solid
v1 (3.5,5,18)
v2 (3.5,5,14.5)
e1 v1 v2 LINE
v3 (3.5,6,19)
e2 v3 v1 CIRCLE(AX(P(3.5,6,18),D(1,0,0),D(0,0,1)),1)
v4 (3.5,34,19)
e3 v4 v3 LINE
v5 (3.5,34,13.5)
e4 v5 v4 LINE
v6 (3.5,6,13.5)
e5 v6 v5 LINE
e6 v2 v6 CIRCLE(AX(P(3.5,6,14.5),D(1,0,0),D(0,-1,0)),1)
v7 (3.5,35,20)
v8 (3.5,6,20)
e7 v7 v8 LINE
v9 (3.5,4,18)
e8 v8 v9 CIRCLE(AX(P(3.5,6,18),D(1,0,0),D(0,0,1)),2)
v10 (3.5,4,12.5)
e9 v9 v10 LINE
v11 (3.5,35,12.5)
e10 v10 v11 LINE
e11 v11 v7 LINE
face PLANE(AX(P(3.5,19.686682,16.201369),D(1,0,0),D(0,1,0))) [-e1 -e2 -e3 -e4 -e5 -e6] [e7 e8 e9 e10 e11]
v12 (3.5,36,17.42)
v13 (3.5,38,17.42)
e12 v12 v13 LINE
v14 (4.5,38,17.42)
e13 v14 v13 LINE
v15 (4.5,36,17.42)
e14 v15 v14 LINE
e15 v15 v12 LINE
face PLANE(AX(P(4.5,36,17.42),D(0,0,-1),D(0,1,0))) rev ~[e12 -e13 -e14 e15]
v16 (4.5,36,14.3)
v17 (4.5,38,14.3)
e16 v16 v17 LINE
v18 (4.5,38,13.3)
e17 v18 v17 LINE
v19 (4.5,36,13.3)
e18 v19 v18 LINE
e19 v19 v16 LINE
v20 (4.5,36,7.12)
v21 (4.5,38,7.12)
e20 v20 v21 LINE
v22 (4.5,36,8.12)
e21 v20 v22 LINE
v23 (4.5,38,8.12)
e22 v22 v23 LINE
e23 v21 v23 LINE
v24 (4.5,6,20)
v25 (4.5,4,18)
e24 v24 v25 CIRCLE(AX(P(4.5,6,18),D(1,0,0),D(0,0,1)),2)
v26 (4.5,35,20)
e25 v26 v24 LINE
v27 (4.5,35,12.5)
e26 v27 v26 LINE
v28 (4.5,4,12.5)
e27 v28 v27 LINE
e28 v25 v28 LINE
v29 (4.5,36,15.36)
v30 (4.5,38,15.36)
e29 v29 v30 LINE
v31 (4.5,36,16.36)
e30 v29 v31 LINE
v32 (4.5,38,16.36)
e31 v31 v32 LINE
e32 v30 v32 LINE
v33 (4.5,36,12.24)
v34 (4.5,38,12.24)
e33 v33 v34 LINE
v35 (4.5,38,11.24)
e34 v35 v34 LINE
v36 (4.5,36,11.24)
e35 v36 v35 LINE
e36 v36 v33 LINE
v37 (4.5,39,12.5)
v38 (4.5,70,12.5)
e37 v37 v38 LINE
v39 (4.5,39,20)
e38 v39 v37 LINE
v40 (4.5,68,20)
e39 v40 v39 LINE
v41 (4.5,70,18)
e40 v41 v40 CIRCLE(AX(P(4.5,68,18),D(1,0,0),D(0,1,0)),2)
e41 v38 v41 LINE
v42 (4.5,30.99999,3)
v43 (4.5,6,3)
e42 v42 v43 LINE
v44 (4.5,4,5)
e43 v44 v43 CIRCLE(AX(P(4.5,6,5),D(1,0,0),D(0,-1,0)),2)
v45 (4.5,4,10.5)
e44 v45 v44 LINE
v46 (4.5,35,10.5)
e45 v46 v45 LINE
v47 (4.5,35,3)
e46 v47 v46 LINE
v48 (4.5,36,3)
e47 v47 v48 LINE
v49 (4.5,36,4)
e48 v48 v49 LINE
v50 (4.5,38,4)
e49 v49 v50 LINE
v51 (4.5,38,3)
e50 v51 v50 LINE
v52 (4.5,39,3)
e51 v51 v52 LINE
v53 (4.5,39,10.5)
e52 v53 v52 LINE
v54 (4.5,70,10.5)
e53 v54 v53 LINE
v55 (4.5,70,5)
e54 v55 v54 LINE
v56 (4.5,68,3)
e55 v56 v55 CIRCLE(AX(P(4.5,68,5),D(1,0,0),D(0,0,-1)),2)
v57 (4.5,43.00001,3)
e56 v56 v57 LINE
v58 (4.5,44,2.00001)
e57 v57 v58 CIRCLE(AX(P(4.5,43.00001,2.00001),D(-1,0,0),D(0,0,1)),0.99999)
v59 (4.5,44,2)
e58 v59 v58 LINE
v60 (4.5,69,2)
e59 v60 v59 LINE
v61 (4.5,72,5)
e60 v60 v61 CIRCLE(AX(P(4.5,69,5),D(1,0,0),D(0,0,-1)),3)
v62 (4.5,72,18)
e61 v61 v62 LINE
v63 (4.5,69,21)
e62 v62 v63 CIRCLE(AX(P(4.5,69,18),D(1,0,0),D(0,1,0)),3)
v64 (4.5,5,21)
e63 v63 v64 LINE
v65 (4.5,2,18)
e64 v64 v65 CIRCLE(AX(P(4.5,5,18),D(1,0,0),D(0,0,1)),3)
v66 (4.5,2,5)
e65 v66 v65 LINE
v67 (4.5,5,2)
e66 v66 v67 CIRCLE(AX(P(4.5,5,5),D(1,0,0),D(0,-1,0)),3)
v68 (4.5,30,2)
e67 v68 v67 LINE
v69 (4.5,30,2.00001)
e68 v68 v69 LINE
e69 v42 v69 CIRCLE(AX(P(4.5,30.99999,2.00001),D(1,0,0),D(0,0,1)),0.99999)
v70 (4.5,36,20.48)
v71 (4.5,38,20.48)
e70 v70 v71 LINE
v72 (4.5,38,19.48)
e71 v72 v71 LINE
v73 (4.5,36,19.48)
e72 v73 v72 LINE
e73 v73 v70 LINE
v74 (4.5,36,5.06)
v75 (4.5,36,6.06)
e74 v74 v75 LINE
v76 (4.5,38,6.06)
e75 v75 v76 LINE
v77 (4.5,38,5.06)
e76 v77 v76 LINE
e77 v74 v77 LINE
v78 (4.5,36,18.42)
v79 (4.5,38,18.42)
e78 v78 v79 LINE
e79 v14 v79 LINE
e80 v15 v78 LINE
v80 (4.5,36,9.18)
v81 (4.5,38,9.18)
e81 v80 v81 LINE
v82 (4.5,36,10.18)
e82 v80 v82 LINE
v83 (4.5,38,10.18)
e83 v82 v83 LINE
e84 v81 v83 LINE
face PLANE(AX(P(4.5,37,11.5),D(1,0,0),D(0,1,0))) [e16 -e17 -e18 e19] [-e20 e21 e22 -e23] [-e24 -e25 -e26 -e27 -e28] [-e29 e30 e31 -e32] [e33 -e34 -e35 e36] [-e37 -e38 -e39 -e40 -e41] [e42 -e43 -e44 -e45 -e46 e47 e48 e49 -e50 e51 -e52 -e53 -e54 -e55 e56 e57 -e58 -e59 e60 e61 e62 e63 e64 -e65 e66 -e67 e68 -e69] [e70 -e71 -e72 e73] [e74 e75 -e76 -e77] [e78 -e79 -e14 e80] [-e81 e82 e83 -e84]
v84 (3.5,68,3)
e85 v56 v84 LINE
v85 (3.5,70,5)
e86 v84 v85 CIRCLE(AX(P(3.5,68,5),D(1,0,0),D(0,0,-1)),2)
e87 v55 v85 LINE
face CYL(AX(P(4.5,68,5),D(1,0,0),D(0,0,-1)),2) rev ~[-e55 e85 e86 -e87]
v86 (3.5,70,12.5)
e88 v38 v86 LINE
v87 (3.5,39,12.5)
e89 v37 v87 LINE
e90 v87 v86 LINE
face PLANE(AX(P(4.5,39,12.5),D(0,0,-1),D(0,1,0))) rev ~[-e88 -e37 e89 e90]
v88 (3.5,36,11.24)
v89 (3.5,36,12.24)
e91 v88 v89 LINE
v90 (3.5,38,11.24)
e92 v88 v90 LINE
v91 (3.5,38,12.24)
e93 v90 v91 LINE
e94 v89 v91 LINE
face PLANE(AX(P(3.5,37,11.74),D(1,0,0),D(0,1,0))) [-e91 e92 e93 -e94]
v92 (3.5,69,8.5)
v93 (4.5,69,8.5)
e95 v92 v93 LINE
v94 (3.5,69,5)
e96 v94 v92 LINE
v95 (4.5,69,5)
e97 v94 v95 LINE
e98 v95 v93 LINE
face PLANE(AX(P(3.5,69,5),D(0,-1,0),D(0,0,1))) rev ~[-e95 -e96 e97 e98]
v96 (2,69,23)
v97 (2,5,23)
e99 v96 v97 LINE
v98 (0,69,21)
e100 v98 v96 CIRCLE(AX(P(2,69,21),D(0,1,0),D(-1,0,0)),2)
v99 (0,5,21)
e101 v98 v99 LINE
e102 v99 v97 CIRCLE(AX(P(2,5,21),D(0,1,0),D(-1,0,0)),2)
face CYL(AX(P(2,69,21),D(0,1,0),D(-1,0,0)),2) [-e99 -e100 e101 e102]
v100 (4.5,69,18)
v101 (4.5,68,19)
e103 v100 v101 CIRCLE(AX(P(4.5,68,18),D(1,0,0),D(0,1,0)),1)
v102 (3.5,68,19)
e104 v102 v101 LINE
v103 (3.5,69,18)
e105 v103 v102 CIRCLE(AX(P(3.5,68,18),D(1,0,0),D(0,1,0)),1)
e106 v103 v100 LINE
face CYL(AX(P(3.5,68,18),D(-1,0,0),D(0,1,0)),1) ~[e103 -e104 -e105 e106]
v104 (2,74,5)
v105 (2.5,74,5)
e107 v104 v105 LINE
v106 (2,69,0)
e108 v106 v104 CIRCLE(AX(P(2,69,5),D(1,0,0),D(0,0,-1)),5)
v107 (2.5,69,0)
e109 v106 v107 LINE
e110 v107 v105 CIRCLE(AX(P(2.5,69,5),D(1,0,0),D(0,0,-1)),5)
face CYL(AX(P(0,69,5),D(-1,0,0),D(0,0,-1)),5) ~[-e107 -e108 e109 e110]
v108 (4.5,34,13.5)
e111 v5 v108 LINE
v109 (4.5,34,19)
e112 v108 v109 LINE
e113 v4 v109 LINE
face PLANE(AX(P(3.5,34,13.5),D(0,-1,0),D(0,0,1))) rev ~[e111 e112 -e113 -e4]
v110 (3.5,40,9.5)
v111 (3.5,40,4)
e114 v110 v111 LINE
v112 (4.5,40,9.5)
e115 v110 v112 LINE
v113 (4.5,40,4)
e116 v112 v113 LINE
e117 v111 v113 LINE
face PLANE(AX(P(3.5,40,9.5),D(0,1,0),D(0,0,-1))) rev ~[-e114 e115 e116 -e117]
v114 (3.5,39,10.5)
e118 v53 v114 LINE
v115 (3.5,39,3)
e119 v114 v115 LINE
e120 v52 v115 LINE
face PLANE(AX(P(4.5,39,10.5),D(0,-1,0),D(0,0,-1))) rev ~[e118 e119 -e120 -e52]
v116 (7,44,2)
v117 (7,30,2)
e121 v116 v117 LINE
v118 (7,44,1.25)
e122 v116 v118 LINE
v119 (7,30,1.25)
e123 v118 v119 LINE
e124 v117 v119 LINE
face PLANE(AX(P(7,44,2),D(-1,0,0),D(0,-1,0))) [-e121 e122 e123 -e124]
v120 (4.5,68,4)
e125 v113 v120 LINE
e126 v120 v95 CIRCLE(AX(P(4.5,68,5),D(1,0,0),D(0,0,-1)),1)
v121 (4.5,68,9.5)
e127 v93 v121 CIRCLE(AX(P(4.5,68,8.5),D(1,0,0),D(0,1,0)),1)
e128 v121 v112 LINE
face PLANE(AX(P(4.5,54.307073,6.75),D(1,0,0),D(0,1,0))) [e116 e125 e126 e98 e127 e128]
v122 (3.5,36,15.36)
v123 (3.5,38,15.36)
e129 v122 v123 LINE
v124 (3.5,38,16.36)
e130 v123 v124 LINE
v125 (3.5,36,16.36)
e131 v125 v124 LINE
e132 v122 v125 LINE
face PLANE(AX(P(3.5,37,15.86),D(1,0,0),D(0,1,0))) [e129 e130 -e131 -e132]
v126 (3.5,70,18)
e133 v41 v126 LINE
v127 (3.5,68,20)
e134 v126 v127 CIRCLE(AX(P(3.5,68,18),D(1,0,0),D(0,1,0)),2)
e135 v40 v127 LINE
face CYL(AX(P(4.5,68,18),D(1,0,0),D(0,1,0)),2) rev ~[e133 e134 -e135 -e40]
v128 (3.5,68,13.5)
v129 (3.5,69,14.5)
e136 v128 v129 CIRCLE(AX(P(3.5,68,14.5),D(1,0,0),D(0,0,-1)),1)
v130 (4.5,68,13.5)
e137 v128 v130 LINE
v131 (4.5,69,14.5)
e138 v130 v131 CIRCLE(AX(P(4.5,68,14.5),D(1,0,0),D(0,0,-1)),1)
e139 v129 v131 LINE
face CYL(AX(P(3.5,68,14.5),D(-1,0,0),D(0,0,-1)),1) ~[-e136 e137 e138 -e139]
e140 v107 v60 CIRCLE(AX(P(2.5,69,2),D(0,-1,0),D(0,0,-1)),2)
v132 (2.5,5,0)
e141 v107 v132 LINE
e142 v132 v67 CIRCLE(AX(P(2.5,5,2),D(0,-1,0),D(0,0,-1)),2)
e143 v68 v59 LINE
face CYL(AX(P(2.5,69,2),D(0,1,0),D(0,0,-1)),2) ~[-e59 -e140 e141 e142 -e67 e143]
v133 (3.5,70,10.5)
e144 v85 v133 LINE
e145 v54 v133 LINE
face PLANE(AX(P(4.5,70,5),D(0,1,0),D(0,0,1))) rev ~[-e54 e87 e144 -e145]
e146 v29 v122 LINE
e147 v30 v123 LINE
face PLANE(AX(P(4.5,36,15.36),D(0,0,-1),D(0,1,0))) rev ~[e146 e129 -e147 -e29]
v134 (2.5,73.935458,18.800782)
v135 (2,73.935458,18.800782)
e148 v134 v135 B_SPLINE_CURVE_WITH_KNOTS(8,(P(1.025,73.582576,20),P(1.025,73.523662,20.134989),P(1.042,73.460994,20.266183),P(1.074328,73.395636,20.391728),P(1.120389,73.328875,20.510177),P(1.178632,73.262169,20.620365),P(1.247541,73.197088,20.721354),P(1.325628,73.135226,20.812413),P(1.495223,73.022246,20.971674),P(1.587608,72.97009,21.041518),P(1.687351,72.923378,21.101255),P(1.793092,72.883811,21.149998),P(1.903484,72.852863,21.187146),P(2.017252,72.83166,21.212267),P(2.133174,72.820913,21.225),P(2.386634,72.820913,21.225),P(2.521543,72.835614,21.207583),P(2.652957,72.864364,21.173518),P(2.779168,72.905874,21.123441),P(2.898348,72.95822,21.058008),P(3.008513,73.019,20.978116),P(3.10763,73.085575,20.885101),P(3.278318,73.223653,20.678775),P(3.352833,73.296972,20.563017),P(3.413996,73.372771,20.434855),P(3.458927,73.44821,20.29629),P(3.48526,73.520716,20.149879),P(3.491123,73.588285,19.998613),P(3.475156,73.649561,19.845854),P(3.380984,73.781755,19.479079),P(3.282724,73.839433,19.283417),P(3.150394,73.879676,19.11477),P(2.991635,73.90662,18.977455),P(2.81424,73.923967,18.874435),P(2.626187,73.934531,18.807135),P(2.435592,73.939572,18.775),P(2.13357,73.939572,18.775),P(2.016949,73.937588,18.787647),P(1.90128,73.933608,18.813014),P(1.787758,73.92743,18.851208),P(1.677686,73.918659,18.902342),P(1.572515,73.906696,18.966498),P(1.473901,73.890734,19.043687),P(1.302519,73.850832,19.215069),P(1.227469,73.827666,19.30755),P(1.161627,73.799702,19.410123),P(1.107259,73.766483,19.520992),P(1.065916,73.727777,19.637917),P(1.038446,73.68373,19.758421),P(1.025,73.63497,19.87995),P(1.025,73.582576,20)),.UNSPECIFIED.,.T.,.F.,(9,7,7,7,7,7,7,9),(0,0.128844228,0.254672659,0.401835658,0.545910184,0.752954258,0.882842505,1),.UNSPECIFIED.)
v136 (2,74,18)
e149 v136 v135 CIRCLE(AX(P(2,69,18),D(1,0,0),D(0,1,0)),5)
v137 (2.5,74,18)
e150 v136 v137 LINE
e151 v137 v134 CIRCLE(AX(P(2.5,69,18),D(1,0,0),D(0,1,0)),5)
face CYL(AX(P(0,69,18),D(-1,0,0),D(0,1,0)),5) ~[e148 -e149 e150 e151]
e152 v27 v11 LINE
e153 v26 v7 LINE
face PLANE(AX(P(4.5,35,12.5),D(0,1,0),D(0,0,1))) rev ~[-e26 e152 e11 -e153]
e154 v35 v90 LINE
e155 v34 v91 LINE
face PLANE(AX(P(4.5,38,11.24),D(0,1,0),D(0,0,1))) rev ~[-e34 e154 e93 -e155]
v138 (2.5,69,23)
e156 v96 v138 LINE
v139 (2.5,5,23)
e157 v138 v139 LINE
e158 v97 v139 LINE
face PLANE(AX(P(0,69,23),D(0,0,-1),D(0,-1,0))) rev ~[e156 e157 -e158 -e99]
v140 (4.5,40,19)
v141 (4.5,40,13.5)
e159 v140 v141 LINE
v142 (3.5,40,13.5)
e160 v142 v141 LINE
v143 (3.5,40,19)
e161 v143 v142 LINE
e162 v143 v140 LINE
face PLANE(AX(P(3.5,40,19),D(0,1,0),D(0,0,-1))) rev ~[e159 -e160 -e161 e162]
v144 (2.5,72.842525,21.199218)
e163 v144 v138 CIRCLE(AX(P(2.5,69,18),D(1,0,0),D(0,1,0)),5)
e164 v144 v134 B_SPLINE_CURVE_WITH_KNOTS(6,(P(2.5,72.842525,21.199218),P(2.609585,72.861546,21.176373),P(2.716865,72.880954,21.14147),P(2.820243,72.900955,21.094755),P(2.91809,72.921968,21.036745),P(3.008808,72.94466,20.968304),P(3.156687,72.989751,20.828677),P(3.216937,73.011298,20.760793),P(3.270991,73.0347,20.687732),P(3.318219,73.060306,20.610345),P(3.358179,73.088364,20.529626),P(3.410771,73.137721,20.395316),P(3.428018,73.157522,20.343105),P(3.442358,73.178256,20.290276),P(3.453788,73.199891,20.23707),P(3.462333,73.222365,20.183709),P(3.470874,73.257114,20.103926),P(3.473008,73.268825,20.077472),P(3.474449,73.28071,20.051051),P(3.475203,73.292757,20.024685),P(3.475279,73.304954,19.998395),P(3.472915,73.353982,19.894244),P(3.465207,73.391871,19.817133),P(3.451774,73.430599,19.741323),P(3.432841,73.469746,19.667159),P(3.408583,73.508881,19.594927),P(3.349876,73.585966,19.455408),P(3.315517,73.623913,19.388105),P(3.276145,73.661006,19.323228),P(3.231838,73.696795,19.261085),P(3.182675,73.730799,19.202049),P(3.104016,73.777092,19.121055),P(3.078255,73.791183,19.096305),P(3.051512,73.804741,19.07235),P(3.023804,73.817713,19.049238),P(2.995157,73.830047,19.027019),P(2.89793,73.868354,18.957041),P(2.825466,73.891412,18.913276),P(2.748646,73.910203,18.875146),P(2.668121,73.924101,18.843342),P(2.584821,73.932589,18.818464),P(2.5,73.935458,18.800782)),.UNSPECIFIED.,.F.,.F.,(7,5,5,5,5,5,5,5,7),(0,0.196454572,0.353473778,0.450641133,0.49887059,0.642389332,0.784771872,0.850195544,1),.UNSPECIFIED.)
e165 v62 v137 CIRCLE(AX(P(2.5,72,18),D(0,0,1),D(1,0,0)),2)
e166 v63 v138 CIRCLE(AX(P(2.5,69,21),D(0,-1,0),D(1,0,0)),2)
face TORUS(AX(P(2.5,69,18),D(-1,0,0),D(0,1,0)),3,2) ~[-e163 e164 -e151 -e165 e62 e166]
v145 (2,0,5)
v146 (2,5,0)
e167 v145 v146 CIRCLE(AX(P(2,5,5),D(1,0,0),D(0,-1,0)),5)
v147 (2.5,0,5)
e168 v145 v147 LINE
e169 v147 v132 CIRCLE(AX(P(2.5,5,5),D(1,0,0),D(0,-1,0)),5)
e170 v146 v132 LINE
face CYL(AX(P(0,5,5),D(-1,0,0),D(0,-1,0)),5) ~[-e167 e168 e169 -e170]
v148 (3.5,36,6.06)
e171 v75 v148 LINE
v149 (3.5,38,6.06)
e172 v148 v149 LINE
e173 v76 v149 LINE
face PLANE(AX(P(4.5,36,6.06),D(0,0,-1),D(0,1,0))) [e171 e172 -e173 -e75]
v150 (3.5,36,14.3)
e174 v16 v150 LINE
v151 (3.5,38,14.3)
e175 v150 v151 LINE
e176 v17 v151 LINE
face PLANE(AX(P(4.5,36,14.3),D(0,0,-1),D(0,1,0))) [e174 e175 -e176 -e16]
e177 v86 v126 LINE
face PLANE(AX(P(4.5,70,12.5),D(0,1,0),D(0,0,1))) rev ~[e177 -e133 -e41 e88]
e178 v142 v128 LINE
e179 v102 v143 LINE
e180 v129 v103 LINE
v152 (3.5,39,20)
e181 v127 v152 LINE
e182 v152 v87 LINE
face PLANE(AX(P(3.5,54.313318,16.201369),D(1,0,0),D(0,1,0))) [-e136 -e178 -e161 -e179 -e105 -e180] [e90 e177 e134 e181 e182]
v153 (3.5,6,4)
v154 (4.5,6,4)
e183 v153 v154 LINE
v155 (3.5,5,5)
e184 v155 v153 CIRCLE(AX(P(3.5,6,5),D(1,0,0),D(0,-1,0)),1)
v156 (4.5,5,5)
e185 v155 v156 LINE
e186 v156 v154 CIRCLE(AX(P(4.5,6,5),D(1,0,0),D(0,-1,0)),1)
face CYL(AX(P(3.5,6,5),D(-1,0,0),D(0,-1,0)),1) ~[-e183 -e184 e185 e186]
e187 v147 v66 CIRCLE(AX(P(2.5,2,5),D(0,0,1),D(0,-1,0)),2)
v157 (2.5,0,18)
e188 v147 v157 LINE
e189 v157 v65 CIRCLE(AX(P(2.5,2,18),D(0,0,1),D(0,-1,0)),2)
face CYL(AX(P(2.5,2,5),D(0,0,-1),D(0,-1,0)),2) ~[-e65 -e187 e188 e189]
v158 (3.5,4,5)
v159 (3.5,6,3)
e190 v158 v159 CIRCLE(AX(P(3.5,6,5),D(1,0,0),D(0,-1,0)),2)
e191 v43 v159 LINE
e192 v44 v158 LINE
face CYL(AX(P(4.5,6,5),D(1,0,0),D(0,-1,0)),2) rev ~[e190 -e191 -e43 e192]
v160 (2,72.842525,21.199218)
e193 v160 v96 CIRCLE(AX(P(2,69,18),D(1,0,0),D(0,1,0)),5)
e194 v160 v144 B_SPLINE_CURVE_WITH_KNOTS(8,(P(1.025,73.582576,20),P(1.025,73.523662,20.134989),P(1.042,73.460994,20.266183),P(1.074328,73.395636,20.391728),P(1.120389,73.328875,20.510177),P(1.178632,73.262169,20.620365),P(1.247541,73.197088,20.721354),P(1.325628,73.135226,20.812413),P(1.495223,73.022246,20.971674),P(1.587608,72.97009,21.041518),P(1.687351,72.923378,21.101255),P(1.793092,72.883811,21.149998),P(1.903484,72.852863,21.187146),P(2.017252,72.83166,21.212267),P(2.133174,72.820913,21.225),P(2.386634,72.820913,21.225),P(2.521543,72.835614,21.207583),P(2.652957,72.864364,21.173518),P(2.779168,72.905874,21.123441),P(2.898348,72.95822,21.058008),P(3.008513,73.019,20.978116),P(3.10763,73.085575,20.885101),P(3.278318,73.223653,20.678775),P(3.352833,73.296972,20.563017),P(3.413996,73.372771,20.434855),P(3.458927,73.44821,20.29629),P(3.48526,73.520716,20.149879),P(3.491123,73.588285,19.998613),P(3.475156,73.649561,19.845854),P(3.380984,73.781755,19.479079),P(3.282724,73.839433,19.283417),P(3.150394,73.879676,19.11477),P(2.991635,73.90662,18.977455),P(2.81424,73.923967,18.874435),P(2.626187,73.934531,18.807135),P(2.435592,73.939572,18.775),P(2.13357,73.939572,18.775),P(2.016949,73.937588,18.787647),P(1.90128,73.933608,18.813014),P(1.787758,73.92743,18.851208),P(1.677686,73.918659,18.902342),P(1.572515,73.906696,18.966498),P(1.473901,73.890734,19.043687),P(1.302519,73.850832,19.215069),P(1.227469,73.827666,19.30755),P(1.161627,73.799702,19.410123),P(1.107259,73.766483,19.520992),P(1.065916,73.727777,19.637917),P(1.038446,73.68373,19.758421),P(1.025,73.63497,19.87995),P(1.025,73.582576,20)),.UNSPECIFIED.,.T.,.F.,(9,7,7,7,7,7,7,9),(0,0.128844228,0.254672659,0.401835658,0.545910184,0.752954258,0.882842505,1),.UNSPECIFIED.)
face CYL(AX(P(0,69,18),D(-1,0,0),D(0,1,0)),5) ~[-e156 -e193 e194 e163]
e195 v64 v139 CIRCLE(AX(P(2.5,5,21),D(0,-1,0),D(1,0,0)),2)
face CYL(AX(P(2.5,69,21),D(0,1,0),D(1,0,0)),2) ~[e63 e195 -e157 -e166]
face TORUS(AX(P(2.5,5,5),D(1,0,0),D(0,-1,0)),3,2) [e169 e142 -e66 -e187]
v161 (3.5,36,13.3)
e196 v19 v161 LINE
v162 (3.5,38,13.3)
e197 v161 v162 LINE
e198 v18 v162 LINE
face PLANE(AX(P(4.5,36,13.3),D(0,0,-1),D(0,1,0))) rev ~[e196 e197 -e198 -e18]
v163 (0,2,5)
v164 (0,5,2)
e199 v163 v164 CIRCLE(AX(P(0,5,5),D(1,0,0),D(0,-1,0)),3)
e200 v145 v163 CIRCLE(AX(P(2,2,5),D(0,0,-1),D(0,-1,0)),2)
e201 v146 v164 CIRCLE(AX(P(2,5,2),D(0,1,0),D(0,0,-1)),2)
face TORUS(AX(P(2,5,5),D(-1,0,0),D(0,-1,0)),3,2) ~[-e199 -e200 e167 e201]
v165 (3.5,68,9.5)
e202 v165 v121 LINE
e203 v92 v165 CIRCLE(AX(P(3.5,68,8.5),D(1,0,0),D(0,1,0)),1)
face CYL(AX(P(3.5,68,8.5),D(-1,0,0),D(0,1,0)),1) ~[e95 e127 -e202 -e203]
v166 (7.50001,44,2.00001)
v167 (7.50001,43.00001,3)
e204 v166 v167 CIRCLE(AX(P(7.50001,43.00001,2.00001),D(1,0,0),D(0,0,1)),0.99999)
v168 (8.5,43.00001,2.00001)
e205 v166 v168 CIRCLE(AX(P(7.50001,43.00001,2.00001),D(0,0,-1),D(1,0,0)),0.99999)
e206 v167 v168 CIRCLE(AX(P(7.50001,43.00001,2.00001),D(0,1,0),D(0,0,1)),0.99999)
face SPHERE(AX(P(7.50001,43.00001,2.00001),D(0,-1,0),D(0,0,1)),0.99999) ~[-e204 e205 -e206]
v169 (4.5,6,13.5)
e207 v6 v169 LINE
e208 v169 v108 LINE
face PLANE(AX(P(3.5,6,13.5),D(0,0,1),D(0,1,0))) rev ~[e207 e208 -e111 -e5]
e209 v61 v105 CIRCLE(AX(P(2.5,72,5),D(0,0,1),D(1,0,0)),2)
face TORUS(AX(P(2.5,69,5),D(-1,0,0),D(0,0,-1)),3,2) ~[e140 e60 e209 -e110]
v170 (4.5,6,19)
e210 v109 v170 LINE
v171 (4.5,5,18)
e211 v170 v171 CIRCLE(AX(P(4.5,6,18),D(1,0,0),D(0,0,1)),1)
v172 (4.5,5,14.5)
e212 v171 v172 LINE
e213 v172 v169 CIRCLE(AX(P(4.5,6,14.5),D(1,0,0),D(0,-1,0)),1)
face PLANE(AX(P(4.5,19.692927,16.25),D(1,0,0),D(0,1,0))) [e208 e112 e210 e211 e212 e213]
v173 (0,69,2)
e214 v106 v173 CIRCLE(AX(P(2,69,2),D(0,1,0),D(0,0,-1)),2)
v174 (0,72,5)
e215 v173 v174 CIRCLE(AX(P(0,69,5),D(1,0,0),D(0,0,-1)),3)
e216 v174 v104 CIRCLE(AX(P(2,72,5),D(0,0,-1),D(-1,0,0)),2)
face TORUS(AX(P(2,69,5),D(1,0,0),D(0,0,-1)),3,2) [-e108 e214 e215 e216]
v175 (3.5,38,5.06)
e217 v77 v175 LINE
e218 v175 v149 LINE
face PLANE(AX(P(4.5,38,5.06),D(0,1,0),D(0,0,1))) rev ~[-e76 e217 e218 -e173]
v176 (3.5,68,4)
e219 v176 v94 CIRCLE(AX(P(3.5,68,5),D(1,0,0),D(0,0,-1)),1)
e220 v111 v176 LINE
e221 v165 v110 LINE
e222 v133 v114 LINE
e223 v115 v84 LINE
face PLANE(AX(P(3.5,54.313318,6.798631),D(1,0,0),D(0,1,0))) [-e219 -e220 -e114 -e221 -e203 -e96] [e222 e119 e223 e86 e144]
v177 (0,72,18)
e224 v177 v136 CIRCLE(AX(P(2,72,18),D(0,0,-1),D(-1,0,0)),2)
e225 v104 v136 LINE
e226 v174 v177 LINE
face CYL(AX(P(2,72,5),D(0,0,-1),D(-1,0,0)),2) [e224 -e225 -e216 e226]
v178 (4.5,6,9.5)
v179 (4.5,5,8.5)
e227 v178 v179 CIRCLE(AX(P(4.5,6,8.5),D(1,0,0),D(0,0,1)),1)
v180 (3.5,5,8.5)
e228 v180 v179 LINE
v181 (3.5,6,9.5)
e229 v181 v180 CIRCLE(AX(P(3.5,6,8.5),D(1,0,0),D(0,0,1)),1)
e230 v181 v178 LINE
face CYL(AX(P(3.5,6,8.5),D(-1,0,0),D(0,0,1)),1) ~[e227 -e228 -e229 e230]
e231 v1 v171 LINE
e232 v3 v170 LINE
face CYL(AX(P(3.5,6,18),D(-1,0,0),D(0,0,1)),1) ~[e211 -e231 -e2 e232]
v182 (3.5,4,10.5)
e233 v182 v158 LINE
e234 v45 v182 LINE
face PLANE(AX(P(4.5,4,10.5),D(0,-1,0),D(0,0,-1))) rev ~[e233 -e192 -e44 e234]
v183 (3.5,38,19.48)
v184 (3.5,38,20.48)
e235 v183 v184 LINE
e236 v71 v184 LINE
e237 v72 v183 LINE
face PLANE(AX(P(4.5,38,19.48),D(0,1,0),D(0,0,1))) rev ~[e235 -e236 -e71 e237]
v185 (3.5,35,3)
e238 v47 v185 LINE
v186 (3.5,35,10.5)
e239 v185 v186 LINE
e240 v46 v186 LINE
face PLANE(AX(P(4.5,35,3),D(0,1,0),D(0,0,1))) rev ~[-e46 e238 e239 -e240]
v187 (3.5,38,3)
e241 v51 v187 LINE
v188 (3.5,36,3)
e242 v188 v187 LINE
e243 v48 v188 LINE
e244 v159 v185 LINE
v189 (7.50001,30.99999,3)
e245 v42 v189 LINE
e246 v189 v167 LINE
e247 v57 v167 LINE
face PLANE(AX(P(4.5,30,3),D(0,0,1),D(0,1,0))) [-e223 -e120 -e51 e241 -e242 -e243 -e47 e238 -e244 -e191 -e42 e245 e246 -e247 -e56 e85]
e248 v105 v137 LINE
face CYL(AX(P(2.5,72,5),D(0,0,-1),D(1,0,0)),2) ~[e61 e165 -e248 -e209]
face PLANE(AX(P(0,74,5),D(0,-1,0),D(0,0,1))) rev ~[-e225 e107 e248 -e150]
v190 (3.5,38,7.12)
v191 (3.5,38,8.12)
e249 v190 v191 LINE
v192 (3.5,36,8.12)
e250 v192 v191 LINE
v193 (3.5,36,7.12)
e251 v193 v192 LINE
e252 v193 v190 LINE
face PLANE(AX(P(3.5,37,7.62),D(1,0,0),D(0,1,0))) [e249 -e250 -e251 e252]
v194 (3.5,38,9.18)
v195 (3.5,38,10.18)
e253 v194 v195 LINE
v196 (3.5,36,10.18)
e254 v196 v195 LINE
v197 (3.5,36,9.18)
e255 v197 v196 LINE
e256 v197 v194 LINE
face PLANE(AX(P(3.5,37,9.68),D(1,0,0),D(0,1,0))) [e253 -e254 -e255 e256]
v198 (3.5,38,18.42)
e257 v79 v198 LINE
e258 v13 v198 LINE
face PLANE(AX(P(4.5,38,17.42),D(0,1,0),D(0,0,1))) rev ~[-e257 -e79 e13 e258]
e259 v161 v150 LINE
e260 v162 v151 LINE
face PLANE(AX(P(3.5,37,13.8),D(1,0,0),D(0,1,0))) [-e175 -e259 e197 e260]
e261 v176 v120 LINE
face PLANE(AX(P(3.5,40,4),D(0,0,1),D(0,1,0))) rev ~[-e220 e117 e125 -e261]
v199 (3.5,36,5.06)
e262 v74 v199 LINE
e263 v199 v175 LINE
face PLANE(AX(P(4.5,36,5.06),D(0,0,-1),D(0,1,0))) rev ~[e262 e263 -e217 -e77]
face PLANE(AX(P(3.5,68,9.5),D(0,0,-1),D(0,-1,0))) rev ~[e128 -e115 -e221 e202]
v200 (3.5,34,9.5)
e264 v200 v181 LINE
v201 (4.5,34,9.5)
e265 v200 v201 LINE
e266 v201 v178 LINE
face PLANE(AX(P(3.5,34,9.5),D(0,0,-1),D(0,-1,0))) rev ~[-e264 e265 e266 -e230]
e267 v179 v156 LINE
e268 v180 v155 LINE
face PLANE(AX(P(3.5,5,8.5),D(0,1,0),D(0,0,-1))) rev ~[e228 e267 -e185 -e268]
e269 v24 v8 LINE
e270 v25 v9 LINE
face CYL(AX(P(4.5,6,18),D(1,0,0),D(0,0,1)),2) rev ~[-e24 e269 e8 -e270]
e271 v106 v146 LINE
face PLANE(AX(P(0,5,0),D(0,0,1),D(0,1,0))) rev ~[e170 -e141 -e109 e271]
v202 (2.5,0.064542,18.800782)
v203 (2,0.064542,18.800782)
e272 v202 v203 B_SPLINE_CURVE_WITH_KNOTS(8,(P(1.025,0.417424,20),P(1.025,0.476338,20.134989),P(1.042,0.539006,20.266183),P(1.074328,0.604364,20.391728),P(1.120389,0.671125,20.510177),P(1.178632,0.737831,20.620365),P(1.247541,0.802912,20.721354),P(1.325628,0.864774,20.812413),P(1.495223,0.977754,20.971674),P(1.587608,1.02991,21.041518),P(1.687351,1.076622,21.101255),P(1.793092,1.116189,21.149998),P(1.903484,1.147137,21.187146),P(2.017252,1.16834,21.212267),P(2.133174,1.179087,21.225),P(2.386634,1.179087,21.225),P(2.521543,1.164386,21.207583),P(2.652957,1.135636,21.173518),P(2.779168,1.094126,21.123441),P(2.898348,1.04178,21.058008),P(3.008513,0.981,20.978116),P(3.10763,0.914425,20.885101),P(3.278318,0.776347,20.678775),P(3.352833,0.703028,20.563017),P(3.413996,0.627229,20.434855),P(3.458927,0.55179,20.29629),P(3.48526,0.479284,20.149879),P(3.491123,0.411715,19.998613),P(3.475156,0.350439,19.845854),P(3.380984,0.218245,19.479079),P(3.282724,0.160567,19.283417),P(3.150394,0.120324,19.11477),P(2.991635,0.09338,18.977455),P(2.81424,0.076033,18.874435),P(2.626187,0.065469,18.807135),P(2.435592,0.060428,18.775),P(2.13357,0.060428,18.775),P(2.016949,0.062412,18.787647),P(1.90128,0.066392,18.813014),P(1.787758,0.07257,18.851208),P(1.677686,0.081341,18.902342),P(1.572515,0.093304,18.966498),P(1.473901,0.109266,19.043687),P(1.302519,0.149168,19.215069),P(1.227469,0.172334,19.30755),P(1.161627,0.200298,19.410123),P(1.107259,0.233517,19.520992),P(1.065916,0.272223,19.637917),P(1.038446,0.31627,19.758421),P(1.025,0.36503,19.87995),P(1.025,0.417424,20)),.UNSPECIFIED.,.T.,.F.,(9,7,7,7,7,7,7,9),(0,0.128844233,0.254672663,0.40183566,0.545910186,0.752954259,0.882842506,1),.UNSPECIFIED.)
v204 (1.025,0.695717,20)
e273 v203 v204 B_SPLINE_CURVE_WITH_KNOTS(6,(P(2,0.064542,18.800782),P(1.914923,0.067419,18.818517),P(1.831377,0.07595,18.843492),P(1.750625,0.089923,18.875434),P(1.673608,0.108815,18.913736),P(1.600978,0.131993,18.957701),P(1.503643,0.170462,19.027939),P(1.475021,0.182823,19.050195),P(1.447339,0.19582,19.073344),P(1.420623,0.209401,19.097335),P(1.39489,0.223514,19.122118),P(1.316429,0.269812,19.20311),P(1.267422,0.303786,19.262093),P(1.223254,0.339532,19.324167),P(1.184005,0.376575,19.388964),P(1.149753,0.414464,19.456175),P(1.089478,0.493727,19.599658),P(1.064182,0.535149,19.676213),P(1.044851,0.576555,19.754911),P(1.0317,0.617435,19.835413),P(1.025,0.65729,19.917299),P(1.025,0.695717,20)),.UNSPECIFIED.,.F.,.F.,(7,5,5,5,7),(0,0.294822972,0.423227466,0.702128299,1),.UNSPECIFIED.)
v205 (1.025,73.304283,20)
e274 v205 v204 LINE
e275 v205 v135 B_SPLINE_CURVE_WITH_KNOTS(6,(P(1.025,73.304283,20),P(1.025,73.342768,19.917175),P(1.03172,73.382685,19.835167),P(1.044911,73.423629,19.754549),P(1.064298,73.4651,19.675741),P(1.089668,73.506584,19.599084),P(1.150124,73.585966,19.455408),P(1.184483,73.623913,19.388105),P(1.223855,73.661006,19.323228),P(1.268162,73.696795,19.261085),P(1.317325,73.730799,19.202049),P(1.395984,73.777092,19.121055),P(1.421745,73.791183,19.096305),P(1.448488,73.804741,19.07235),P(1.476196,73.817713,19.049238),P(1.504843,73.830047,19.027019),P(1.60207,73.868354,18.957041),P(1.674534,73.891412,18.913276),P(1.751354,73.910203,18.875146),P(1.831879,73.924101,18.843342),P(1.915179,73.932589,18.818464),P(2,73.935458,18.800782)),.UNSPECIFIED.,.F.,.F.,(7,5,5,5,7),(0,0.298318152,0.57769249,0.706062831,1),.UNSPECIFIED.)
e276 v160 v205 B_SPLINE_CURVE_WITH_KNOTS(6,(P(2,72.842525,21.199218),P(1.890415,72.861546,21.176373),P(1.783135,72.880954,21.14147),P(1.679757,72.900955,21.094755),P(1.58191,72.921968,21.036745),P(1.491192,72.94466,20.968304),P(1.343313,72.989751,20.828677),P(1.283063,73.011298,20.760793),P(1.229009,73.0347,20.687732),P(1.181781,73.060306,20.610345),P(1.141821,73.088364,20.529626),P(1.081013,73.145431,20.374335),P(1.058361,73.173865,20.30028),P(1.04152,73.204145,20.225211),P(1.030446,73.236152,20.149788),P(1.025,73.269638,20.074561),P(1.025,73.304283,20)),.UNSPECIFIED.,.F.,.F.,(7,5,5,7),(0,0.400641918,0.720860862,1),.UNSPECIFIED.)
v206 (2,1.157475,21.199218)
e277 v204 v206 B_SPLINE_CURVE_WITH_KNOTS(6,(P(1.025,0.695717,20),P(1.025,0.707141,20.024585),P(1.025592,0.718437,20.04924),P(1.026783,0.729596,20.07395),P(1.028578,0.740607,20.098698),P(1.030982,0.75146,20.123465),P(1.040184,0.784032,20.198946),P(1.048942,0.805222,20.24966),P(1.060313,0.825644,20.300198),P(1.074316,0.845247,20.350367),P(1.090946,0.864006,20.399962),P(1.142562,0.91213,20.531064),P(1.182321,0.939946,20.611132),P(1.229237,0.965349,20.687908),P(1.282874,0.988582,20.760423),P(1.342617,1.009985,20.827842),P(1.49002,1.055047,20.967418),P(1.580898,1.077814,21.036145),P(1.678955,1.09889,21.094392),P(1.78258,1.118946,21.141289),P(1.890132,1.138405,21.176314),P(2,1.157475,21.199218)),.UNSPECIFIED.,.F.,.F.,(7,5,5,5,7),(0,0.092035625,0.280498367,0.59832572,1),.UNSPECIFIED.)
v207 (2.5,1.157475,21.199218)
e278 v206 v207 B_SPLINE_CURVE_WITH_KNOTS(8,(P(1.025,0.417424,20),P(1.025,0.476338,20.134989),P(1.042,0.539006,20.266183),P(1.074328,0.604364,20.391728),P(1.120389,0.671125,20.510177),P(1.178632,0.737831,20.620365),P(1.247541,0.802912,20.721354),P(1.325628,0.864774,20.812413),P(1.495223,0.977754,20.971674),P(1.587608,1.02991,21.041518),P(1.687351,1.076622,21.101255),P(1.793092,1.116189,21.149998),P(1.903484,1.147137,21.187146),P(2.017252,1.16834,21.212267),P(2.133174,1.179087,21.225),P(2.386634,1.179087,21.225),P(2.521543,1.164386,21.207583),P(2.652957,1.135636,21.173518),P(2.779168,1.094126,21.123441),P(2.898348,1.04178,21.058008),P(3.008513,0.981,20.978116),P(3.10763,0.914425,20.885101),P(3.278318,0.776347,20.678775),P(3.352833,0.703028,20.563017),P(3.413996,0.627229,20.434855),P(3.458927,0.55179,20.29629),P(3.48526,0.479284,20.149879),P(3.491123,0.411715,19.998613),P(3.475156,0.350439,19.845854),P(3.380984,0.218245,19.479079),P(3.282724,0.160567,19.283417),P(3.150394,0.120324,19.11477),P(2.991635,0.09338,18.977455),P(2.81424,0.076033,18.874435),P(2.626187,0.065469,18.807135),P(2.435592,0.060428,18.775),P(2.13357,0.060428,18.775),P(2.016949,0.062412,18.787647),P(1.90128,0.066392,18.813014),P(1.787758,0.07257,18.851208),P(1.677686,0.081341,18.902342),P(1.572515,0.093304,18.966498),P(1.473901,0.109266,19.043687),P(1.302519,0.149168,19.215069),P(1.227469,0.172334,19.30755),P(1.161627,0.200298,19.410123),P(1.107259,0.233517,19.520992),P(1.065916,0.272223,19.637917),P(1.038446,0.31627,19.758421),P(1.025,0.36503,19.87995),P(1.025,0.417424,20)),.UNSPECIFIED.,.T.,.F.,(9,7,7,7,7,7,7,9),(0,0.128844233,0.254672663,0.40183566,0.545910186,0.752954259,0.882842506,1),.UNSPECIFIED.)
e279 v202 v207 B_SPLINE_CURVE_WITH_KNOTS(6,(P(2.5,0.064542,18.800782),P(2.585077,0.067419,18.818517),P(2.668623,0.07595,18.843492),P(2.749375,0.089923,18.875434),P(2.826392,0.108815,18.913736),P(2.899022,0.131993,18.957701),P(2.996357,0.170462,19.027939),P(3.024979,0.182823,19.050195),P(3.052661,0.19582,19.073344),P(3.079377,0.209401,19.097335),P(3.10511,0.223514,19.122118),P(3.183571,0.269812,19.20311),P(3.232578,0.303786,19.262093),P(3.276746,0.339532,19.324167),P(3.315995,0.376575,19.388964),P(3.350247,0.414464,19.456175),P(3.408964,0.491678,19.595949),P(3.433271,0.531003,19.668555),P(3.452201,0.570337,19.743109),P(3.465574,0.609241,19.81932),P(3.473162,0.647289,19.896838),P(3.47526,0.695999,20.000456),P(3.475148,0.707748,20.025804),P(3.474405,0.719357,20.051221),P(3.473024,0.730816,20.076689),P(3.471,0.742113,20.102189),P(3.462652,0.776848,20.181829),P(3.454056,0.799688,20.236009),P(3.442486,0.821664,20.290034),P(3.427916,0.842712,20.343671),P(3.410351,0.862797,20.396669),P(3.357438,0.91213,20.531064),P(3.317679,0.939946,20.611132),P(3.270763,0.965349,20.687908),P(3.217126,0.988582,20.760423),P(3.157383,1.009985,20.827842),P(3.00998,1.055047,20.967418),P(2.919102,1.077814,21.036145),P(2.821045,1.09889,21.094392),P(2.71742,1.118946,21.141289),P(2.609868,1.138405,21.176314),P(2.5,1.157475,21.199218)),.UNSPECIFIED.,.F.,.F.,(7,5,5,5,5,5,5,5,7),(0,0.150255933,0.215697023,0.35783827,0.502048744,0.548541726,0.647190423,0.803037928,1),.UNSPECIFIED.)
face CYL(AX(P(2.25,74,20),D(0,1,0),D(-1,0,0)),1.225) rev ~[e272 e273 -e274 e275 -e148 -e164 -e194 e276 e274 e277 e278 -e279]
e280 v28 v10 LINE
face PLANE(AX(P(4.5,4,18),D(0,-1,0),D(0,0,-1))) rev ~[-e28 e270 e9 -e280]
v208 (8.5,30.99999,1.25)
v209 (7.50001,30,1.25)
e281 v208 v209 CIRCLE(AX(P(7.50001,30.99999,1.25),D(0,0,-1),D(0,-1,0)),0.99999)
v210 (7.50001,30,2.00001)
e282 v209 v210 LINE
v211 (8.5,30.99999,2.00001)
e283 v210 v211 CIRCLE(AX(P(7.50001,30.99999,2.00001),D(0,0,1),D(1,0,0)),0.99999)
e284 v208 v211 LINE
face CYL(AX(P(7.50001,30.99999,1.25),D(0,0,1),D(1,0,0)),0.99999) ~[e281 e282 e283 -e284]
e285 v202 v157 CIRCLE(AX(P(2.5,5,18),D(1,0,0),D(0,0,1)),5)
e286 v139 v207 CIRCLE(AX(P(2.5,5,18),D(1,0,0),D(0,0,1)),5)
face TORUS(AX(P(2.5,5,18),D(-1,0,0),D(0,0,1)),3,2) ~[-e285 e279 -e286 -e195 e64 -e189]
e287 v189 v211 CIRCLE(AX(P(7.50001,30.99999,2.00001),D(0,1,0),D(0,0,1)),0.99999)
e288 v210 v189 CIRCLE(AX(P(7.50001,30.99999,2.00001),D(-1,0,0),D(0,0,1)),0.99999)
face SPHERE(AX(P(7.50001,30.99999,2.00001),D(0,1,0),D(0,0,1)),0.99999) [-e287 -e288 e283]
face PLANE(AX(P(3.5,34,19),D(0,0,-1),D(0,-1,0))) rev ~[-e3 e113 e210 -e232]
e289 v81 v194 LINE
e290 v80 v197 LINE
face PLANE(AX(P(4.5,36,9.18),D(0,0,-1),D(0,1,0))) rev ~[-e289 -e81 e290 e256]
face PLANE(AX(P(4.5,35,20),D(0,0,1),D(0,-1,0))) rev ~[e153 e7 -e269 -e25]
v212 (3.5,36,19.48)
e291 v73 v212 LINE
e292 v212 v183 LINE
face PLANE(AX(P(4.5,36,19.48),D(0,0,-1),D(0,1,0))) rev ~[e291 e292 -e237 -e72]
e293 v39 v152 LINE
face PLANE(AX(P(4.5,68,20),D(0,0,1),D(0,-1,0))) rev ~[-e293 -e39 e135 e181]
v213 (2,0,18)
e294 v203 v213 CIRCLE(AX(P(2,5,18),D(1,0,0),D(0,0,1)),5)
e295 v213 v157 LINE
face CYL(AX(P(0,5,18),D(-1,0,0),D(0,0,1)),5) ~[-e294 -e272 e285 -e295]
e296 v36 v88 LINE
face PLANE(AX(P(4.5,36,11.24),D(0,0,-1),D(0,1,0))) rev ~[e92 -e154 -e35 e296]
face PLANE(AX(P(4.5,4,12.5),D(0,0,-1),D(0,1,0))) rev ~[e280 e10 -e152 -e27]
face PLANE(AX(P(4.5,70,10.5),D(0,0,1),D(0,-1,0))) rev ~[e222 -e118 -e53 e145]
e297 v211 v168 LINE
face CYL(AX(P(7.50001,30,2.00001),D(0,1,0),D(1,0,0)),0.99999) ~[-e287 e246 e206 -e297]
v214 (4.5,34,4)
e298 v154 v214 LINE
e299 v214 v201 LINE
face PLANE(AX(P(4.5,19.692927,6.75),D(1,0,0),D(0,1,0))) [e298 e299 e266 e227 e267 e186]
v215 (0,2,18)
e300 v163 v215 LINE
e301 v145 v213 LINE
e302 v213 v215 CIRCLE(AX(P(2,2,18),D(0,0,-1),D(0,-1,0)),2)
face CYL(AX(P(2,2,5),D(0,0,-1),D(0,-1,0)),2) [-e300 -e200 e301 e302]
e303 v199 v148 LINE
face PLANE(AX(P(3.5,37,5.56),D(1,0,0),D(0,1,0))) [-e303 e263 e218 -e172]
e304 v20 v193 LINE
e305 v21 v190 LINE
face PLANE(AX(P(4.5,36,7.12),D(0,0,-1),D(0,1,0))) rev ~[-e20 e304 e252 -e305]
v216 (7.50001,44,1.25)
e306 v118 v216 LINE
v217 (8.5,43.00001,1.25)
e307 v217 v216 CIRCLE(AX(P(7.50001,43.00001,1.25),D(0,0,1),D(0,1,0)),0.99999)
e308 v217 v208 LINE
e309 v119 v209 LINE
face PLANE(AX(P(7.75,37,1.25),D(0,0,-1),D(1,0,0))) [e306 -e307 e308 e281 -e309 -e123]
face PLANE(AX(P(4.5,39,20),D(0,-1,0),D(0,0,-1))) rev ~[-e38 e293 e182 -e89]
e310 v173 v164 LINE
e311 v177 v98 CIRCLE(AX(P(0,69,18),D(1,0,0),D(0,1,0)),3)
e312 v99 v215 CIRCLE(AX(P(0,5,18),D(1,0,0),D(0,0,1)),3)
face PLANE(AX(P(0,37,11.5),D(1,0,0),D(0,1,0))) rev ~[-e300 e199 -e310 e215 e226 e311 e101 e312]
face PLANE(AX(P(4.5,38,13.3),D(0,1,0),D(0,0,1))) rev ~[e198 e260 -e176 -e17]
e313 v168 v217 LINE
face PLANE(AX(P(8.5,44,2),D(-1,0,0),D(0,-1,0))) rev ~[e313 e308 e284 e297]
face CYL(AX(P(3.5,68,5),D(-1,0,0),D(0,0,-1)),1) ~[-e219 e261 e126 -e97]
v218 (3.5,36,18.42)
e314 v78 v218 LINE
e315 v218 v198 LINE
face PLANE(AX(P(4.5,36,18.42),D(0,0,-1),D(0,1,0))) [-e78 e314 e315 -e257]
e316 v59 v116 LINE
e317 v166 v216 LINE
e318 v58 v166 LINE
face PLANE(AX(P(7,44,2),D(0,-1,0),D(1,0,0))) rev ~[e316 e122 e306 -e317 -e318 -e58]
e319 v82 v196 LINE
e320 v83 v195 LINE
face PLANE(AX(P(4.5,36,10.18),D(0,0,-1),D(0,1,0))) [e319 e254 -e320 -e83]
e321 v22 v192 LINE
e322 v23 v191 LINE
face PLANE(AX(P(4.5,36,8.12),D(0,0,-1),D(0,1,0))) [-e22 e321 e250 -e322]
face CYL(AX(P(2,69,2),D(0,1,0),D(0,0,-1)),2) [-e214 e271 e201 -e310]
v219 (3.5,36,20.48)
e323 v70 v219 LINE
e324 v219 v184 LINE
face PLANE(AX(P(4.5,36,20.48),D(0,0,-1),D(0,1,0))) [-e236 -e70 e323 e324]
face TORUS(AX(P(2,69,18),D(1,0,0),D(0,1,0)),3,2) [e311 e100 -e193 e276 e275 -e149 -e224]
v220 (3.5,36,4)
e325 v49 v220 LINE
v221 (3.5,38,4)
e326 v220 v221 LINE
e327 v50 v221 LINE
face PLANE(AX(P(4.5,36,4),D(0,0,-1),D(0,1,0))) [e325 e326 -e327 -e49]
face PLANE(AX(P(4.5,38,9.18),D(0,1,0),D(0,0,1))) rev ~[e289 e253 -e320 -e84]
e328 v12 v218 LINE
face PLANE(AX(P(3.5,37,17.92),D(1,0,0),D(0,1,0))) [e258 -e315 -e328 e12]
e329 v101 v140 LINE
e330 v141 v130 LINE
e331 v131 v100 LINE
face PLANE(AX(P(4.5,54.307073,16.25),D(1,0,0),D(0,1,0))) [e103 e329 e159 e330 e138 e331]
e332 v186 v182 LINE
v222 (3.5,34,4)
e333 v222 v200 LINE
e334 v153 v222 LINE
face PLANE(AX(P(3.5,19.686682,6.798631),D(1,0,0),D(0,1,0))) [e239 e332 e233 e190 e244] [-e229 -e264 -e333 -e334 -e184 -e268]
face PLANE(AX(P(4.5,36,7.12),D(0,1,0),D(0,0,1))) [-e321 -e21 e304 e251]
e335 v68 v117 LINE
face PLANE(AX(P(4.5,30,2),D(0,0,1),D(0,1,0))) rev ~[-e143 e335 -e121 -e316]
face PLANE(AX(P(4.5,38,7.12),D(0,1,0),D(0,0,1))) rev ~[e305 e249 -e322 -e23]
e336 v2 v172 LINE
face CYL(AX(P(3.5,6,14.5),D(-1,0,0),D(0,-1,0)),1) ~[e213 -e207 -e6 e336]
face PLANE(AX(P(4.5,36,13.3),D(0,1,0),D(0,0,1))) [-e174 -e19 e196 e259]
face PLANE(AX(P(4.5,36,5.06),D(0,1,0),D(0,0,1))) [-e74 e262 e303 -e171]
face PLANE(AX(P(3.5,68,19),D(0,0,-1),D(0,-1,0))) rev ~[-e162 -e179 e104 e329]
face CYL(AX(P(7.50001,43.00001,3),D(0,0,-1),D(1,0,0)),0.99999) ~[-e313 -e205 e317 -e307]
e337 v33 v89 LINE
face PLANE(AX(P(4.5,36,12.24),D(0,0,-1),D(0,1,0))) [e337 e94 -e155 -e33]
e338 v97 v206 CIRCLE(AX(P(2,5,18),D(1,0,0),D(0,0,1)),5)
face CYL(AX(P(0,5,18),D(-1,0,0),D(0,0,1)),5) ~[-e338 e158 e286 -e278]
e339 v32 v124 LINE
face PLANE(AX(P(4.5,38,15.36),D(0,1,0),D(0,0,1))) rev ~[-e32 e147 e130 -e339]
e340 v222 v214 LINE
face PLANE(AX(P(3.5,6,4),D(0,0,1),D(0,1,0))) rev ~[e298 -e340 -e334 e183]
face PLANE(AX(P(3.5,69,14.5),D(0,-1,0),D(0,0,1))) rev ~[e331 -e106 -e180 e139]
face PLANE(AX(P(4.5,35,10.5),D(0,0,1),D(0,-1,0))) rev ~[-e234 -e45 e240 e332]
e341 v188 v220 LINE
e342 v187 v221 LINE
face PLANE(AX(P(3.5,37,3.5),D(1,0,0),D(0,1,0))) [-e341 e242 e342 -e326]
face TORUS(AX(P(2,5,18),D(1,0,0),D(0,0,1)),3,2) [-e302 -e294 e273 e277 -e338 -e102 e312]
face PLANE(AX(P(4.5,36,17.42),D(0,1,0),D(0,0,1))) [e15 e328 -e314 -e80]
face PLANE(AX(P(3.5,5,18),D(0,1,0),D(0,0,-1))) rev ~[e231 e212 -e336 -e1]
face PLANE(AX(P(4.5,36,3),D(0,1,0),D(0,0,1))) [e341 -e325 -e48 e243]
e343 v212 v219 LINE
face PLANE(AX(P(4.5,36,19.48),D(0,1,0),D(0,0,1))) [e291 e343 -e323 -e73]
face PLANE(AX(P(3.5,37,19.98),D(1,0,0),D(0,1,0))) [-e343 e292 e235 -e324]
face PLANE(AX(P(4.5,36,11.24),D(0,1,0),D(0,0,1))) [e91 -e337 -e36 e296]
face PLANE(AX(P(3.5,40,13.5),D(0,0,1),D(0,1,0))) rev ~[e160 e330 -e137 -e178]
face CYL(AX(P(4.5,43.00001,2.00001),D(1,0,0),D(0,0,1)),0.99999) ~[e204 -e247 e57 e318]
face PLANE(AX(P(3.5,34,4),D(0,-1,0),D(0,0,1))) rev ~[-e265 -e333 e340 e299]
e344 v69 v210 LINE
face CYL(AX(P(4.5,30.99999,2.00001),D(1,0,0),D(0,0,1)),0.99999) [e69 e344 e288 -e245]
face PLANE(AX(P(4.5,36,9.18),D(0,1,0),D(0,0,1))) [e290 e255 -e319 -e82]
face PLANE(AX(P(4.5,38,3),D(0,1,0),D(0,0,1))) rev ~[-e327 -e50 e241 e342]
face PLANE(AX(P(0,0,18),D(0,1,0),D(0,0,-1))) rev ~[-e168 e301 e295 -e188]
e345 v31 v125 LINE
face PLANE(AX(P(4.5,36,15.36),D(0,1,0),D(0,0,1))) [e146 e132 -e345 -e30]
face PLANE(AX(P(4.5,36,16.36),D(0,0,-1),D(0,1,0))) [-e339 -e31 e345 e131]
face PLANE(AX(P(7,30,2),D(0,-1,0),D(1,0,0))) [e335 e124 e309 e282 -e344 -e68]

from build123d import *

# Parameters (mm, degrees)
F1_DEPTH     = 4.5
F2_R         = 1.225
F3_DEPTH     = 74
F4_T1_DEPTH  = 64
F4_T3_DEPTH  = 13
F4_T6_ANGLE  = 90
F4_T8_ANGLE  = 90
F4_T10_ANGLE = 90
F4_T12_ANGLE = 90
F4_T14_ANGLE = 90
F4_T16_ANGLE = 90
F4_T18_ANGLE = 90
F4_T20_ANGLE = 90
F6_DEPTH     = 1
F7_W         = 2
F7_H         = 1
F8_DEPTH     = 1
F10_DEPTH    = 1
F11_W        = 14
F11_H        = 1
F12_DEPTH    = 4
F13_W        = 1.5
F13_H        = 14
F14_DEPTH    = 0.75
F15_R        = 0.99999


# Not quite as in the source:
# - a fillet or chamfer that OpenCascade refuses, or shapes differently, is made with other operations: its cross-section is extruded or revolved along the edge and cut away or added
# - a fillet or chamfer is up to 0.001 mm smaller than in the source, because OpenCascade refuses the exact size


with BuildPart() as f1:
    # F0 (on Right) → F1 (new body)
    with BuildSketch(Plane.YZ):
        with BuildLine():
            ThreePointArc((0, 5), (1.4644660941, 1.4644660941), (5, 0))
            Line((5, 0), (69, 0))
            ThreePointArc((69, 0), (72.5355339059, 1.4644660941), (74, 5))
            Line((74, 5), (74, 18))
            ThreePointArc((74, 18), (72.5355339059, 21.5355339059), (69, 23))
            Line((69, 23), (5, 23))
            ThreePointArc((5, 23), (1.4644660941, 21.5355339059), (0, 18))
            Line((0, 18), (0, 5))
        make_face()
    extrude(amount=F1_DEPTH)

    # F2 (on face) → F3 (cut, through all)
    with BuildSketch(Plane(origin=(0, 74, 0), x_dir=(-1, 0, 0), z_dir=(0, 1, 0))):
        with Locations((-2.25, 20)):
            Circle(F2_R)
    extrude(amount=-F3_DEPTH, mode=Mode.SUBTRACT)

    # F4: fillet of radius 2 on 16 edges, made by hand

    # F4_s2 → F4_t1 (cut)
    with BuildSketch(Plane.XZ.offset(-69)):
        with BuildLine():
            ThreePointArc((0, 21), (0.5857864376, 22.4142135624), (2, 23))
            Line((2, 23), (0, 23))
            Line((0, 23), (0, 21))
        make_face()
        with BuildLine():
            ThreePointArc((4.5, 21), (3.9142135624, 22.4142135624), (2.5, 23))
            Line((2.5, 23), (4.5, 23))
            Line((4.5, 23), (4.5, 21))
        make_face()
        with BuildLine():
            ThreePointArc((2, 0), (0.5857864376, 0.5857864376), (0, 2))
            Line((0, 2), (0, 0))
            Line((0, 0), (2, 0))
        make_face()
        with BuildLine():
            ThreePointArc((2.5, 0), (3.9142135624, 0.5857864376), (4.5, 2))
            Line((4.5, 2), (4.5, 0))
            Line((4.5, 0), (2.5, 0))
        make_face()
    extrude(amount=F4_T1_DEPTH, mode=Mode.SUBTRACT)

    # F4_s4 → F4_t3 (cut)
    with BuildSketch(Plane.XY.offset(5)):
        with BuildLine():
            ThreePointArc((2, 0), (0.5857864376, 0.5857864376), (0, 2))
            Line((0, 2), (0, 0))
            Line((0, 0), (2, 0))
        make_face()
        with BuildLine():
            ThreePointArc((2.5, 0), (3.9142135624, 0.5857864376), (4.5, 2))
            Line((4.5, 2), (4.5, 0))
            Line((4.5, 0), (2.5, 0))
        make_face()
        with BuildLine():
            ThreePointArc((0, 72), (0.5857864376, 73.4142135624), (2, 74))
            Line((2, 74), (0, 74))
            Line((0, 74), (0, 72))
        make_face()
        with BuildLine():
            ThreePointArc((4.5, 72), (3.9142135624, 73.4142135624), (2.5, 74))
            Line((2.5, 74), (4.5, 74))
            Line((4.5, 74), (4.5, 72))
        make_face()
    extrude(amount=F4_T3_DEPTH, mode=Mode.SUBTRACT)

    # F4_s5 → F4_t6 (revolve, cut)
    with BuildSketch(Plane.XY.offset(5)):
        with BuildLine():
            ThreePointArc((2, 0), (0.5857864376, 0.5857864376), (0, 2))
            Line((0, 2), (0, 0))
            Line((0, 0), (2, 0))
        make_face()
    revolve(axis=Axis((0, 5, 5), (1, 0, 0)), revolution_arc=F4_T6_ANGLE, mode=Mode.SUBTRACT)

    # F4_s7 → F4_t8 (revolve, cut)
    with BuildSketch(Plane.XY.offset(5)):
        with BuildLine():
            ThreePointArc((2.5, 0), (3.9142135624, 0.5857864376), (4.5, 2))
            Line((4.5, 2), (4.5, 0))
            Line((4.5, 0), (2.5, 0))
        make_face()
    revolve(axis=Axis((4.5, 5, 5), (1, 0, 0)), revolution_arc=F4_T8_ANGLE, mode=Mode.SUBTRACT)

    # F4_s9 → F4_t10 (revolve, cut)
    with BuildSketch(Plane.XZ.offset(-69)):
        with BuildLine():
            ThreePointArc((0, 2), (0.5857864376, 0.5857864376), (2, 0))
            Line((2, 0), (0, 0))
            Line((0, 0), (0, 2))
        make_face()
    revolve(axis=Axis((0, 69, 5), (1, 0, 0)), revolution_arc=F4_T10_ANGLE, mode=Mode.SUBTRACT)

    # F4_s11 → F4_t12 (revolve, cut)
    with BuildSketch(Plane.XY.offset(18)):
        with BuildLine():
            ThreePointArc((0, 72), (0.5857864376, 73.4142135624), (2, 74))
            Line((2, 74), (0, 74))
            Line((0, 74), (0, 72))
        make_face()
    revolve(axis=Axis((0, 69, 18), (1, 0, 0)), revolution_arc=F4_T12_ANGLE, mode=Mode.SUBTRACT)

    # F4_s13 → F4_t14 (revolve, cut)
    with BuildSketch(Plane.XZ.offset(-5)):
        with BuildLine():
            ThreePointArc((0, 21), (0.5857864376, 22.4142135624), (2, 23))
            Line((2, 23), (0, 23))
            Line((0, 23), (0, 21))
        make_face()
    revolve(axis=Axis((0, 5, 18), (1, 0, 0)), revolution_arc=F4_T14_ANGLE, mode=Mode.SUBTRACT)

    # F4_s15 → F4_t16 (revolve, cut)
    with BuildSketch(Plane.XZ.offset(-69)):
        with BuildLine():
            ThreePointArc((4.5, 2), (3.9142135624, 0.5857864376), (2.5, 0))
            Line((2.5, 0), (4.5, 0))
            Line((4.5, 0), (4.5, 2))
        make_face()
    revolve(axis=Axis((4.5, 69, 5), (1, 0, 0)), revolution_arc=F4_T16_ANGLE, mode=Mode.SUBTRACT)

    # F4_s17 → F4_t18 (revolve, cut)
    with BuildSketch(Plane.XY.offset(18)):
        with BuildLine():
            ThreePointArc((4.5, 72), (3.9142135624, 73.4142135624), (2.5, 74))
            Line((2.5, 74), (4.5, 74))
            Line((4.5, 74), (4.5, 72))
        make_face()
    revolve(axis=Axis((4.5, 69, 18), (1, 0, 0)), revolution_arc=F4_T18_ANGLE, mode=Mode.SUBTRACT)

    # F4_s19 → F4_t20 (revolve, cut)
    with BuildSketch(Plane.XZ.offset(-5)):
        with BuildLine():
            ThreePointArc((4.5, 21), (3.9142135624, 22.4142135624), (2.5, 23))
            Line((2.5, 23), (4.5, 23))
            Line((4.5, 23), (4.5, 21))
        make_face()
    revolve(axis=Axis((4.5, 5, 18), (1, 0, 0)), revolution_arc=F4_T20_ANGLE, mode=Mode.SUBTRACT)

    # F5 (on face) → F6 (cut)
    with BuildSketch(Plane.YZ.offset(4.5)):
        with BuildLine():
            Line((35, 20), (6, 20))
            ThreePointArc((6, 20), (4.5857864376, 19.4142135624), (4, 18))
            Line((4, 18), (4, 12.5))
            Line((4, 12.5), (35, 12.5))
            Line((35, 12.5), (35, 20))
        make_face()
        with BuildLine():
            ThreePointArc((4, 5), (4.5857864376, 3.5857864376), (6, 3))
            Line((6, 3), (35, 3))
            Line((35, 3), (35, 10.5))
            Line((35, 10.5), (4, 10.5))
            Line((4, 10.5), (4, 5))
        make_face()
        with BuildLine():
            Line((68, 20), (39, 20))
            Line((39, 20), (39, 12.5))
            Line((39, 12.5), (70, 12.5))
            Line((70, 12.5), (70, 18))
            ThreePointArc((70, 18), (69.4142135624, 19.4142135624), (68, 20))
        make_face()
        with BuildLine():
            Line((39, 10.5), (39, 3))
            Line((39, 3), (68, 3))
            ThreePointArc((68, 3), (69.4142135624, 3.5857864376), (70, 5))
            Line((70, 5), (70, 10.5))
            Line((70, 10.5), (39, 10.5))
        make_face()
    extrude(amount=-F6_DEPTH, mode=Mode.SUBTRACT)

    # F7 (on face) → F8 (cut)
    with BuildSketch(Plane.YZ.offset(4.5)):
        with Locations((37, 3.5)):
            Rectangle(F7_W, F7_H)
        with Locations((37, 5.56)):
            Rectangle(F7_W, F7_H)
        with Locations((37, 7.62)):
            Rectangle(F7_W, F7_H)
        with Locations((37, 9.68)):
            Rectangle(F7_W, F7_H)
        with Locations((37, 11.74)):
            Rectangle(F7_W, F7_H)
        with Locations((37, 13.8)):
            Rectangle(F7_W, F7_H)
        with Locations((37, 15.86)):
            Rectangle(F7_W, F7_H)
        with Locations((37, 17.92)):
            Rectangle(F7_W, F7_H)
        with Locations((37, 19.98)):
            Rectangle(F7_W, F7_H)
    extrude(amount=-F8_DEPTH, mode=Mode.SUBTRACT)

    # F9 (on face) → F10 (join)
    with BuildSketch(Plane.YZ.offset(3.5)):
        with BuildLine():
            ThreePointArc((5, 5), (5.2928932188, 4.2928932188), (6, 4))
            Line((6, 4), (34, 4))
            Line((34, 4), (34, 9.5))
            Line((34, 9.5), (6, 9.5))
            ThreePointArc((6, 9.5), (5.2928932188, 9.2071067812), (5, 8.5))
            Line((5, 8.5), (5, 5))
        make_face()
        with BuildLine():
            Line((34, 19), (6, 19))
            ThreePointArc((6, 19), (5.2928932188, 18.7071067812), (5, 18))
            Line((5, 18), (5, 14.5))
            ThreePointArc((5, 14.5), (5.2928932188, 13.7928932188), (6, 13.5))
            Line((6, 13.5), (34, 13.5))
            Line((34, 13.5), (34, 19))
        make_face()
        with BuildLine():
            ThreePointArc((69, 8.5), (68.7071067812, 9.2071067812), (68, 9.5))
            Line((68, 9.5), (40, 9.5))
            Line((40, 9.5), (40, 4))
            Line((40, 4), (68, 4))
            ThreePointArc((68, 4), (68.7071067812, 4.2928932188), (69, 5))
            Line((69, 5), (69, 8.5))
        make_face()
        with BuildLine():
            ThreePointArc((68, 13.5), (68.7071067812, 13.7928932188), (69, 14.5))
            Line((69, 14.5), (69, 18))
            ThreePointArc((69, 18), (68.7071067812, 18.7071067812), (68, 19))
            Line((68, 19), (40, 19))
            Line((40, 19), (40, 13.5))
            Line((40, 13.5), (68, 13.5))
        make_face()
    extrude(amount=F10_DEPTH)

    # F11 (on face) → F12 (join)
    with BuildSketch(Plane.YZ.offset(4.5)):
        with Locations((37, 2.5)):
            Rectangle(F11_W, F11_H)
    extrude(amount=F12_DEPTH)

    # F13 (on face) → F14 (join)
    with BuildSketch(Plane(origin=(0, 0, 2), x_dir=(1, 0, 0), z_dir=(0, 0, -1))):
        with Locations((7.75, -37)):
            Rectangle(F13_W, F13_H)
    extrude(amount=F14_DEPTH)

    # F15 (radius 1 in the source; OpenCascade refuses exactly that, so slightly less here)
    f15_edges = [f1.edges().sort_by_distance(p)[0] for p in [
        (8.5, 37, 3),
        (6.5, 30, 3),
        (6.5, 44, 3),
        (8.5, 44, 2.125),
        (8.5, 30, 2.125),
    ]]
    fillet(f15_edges, radius=F15_R)


solid = f1.part
